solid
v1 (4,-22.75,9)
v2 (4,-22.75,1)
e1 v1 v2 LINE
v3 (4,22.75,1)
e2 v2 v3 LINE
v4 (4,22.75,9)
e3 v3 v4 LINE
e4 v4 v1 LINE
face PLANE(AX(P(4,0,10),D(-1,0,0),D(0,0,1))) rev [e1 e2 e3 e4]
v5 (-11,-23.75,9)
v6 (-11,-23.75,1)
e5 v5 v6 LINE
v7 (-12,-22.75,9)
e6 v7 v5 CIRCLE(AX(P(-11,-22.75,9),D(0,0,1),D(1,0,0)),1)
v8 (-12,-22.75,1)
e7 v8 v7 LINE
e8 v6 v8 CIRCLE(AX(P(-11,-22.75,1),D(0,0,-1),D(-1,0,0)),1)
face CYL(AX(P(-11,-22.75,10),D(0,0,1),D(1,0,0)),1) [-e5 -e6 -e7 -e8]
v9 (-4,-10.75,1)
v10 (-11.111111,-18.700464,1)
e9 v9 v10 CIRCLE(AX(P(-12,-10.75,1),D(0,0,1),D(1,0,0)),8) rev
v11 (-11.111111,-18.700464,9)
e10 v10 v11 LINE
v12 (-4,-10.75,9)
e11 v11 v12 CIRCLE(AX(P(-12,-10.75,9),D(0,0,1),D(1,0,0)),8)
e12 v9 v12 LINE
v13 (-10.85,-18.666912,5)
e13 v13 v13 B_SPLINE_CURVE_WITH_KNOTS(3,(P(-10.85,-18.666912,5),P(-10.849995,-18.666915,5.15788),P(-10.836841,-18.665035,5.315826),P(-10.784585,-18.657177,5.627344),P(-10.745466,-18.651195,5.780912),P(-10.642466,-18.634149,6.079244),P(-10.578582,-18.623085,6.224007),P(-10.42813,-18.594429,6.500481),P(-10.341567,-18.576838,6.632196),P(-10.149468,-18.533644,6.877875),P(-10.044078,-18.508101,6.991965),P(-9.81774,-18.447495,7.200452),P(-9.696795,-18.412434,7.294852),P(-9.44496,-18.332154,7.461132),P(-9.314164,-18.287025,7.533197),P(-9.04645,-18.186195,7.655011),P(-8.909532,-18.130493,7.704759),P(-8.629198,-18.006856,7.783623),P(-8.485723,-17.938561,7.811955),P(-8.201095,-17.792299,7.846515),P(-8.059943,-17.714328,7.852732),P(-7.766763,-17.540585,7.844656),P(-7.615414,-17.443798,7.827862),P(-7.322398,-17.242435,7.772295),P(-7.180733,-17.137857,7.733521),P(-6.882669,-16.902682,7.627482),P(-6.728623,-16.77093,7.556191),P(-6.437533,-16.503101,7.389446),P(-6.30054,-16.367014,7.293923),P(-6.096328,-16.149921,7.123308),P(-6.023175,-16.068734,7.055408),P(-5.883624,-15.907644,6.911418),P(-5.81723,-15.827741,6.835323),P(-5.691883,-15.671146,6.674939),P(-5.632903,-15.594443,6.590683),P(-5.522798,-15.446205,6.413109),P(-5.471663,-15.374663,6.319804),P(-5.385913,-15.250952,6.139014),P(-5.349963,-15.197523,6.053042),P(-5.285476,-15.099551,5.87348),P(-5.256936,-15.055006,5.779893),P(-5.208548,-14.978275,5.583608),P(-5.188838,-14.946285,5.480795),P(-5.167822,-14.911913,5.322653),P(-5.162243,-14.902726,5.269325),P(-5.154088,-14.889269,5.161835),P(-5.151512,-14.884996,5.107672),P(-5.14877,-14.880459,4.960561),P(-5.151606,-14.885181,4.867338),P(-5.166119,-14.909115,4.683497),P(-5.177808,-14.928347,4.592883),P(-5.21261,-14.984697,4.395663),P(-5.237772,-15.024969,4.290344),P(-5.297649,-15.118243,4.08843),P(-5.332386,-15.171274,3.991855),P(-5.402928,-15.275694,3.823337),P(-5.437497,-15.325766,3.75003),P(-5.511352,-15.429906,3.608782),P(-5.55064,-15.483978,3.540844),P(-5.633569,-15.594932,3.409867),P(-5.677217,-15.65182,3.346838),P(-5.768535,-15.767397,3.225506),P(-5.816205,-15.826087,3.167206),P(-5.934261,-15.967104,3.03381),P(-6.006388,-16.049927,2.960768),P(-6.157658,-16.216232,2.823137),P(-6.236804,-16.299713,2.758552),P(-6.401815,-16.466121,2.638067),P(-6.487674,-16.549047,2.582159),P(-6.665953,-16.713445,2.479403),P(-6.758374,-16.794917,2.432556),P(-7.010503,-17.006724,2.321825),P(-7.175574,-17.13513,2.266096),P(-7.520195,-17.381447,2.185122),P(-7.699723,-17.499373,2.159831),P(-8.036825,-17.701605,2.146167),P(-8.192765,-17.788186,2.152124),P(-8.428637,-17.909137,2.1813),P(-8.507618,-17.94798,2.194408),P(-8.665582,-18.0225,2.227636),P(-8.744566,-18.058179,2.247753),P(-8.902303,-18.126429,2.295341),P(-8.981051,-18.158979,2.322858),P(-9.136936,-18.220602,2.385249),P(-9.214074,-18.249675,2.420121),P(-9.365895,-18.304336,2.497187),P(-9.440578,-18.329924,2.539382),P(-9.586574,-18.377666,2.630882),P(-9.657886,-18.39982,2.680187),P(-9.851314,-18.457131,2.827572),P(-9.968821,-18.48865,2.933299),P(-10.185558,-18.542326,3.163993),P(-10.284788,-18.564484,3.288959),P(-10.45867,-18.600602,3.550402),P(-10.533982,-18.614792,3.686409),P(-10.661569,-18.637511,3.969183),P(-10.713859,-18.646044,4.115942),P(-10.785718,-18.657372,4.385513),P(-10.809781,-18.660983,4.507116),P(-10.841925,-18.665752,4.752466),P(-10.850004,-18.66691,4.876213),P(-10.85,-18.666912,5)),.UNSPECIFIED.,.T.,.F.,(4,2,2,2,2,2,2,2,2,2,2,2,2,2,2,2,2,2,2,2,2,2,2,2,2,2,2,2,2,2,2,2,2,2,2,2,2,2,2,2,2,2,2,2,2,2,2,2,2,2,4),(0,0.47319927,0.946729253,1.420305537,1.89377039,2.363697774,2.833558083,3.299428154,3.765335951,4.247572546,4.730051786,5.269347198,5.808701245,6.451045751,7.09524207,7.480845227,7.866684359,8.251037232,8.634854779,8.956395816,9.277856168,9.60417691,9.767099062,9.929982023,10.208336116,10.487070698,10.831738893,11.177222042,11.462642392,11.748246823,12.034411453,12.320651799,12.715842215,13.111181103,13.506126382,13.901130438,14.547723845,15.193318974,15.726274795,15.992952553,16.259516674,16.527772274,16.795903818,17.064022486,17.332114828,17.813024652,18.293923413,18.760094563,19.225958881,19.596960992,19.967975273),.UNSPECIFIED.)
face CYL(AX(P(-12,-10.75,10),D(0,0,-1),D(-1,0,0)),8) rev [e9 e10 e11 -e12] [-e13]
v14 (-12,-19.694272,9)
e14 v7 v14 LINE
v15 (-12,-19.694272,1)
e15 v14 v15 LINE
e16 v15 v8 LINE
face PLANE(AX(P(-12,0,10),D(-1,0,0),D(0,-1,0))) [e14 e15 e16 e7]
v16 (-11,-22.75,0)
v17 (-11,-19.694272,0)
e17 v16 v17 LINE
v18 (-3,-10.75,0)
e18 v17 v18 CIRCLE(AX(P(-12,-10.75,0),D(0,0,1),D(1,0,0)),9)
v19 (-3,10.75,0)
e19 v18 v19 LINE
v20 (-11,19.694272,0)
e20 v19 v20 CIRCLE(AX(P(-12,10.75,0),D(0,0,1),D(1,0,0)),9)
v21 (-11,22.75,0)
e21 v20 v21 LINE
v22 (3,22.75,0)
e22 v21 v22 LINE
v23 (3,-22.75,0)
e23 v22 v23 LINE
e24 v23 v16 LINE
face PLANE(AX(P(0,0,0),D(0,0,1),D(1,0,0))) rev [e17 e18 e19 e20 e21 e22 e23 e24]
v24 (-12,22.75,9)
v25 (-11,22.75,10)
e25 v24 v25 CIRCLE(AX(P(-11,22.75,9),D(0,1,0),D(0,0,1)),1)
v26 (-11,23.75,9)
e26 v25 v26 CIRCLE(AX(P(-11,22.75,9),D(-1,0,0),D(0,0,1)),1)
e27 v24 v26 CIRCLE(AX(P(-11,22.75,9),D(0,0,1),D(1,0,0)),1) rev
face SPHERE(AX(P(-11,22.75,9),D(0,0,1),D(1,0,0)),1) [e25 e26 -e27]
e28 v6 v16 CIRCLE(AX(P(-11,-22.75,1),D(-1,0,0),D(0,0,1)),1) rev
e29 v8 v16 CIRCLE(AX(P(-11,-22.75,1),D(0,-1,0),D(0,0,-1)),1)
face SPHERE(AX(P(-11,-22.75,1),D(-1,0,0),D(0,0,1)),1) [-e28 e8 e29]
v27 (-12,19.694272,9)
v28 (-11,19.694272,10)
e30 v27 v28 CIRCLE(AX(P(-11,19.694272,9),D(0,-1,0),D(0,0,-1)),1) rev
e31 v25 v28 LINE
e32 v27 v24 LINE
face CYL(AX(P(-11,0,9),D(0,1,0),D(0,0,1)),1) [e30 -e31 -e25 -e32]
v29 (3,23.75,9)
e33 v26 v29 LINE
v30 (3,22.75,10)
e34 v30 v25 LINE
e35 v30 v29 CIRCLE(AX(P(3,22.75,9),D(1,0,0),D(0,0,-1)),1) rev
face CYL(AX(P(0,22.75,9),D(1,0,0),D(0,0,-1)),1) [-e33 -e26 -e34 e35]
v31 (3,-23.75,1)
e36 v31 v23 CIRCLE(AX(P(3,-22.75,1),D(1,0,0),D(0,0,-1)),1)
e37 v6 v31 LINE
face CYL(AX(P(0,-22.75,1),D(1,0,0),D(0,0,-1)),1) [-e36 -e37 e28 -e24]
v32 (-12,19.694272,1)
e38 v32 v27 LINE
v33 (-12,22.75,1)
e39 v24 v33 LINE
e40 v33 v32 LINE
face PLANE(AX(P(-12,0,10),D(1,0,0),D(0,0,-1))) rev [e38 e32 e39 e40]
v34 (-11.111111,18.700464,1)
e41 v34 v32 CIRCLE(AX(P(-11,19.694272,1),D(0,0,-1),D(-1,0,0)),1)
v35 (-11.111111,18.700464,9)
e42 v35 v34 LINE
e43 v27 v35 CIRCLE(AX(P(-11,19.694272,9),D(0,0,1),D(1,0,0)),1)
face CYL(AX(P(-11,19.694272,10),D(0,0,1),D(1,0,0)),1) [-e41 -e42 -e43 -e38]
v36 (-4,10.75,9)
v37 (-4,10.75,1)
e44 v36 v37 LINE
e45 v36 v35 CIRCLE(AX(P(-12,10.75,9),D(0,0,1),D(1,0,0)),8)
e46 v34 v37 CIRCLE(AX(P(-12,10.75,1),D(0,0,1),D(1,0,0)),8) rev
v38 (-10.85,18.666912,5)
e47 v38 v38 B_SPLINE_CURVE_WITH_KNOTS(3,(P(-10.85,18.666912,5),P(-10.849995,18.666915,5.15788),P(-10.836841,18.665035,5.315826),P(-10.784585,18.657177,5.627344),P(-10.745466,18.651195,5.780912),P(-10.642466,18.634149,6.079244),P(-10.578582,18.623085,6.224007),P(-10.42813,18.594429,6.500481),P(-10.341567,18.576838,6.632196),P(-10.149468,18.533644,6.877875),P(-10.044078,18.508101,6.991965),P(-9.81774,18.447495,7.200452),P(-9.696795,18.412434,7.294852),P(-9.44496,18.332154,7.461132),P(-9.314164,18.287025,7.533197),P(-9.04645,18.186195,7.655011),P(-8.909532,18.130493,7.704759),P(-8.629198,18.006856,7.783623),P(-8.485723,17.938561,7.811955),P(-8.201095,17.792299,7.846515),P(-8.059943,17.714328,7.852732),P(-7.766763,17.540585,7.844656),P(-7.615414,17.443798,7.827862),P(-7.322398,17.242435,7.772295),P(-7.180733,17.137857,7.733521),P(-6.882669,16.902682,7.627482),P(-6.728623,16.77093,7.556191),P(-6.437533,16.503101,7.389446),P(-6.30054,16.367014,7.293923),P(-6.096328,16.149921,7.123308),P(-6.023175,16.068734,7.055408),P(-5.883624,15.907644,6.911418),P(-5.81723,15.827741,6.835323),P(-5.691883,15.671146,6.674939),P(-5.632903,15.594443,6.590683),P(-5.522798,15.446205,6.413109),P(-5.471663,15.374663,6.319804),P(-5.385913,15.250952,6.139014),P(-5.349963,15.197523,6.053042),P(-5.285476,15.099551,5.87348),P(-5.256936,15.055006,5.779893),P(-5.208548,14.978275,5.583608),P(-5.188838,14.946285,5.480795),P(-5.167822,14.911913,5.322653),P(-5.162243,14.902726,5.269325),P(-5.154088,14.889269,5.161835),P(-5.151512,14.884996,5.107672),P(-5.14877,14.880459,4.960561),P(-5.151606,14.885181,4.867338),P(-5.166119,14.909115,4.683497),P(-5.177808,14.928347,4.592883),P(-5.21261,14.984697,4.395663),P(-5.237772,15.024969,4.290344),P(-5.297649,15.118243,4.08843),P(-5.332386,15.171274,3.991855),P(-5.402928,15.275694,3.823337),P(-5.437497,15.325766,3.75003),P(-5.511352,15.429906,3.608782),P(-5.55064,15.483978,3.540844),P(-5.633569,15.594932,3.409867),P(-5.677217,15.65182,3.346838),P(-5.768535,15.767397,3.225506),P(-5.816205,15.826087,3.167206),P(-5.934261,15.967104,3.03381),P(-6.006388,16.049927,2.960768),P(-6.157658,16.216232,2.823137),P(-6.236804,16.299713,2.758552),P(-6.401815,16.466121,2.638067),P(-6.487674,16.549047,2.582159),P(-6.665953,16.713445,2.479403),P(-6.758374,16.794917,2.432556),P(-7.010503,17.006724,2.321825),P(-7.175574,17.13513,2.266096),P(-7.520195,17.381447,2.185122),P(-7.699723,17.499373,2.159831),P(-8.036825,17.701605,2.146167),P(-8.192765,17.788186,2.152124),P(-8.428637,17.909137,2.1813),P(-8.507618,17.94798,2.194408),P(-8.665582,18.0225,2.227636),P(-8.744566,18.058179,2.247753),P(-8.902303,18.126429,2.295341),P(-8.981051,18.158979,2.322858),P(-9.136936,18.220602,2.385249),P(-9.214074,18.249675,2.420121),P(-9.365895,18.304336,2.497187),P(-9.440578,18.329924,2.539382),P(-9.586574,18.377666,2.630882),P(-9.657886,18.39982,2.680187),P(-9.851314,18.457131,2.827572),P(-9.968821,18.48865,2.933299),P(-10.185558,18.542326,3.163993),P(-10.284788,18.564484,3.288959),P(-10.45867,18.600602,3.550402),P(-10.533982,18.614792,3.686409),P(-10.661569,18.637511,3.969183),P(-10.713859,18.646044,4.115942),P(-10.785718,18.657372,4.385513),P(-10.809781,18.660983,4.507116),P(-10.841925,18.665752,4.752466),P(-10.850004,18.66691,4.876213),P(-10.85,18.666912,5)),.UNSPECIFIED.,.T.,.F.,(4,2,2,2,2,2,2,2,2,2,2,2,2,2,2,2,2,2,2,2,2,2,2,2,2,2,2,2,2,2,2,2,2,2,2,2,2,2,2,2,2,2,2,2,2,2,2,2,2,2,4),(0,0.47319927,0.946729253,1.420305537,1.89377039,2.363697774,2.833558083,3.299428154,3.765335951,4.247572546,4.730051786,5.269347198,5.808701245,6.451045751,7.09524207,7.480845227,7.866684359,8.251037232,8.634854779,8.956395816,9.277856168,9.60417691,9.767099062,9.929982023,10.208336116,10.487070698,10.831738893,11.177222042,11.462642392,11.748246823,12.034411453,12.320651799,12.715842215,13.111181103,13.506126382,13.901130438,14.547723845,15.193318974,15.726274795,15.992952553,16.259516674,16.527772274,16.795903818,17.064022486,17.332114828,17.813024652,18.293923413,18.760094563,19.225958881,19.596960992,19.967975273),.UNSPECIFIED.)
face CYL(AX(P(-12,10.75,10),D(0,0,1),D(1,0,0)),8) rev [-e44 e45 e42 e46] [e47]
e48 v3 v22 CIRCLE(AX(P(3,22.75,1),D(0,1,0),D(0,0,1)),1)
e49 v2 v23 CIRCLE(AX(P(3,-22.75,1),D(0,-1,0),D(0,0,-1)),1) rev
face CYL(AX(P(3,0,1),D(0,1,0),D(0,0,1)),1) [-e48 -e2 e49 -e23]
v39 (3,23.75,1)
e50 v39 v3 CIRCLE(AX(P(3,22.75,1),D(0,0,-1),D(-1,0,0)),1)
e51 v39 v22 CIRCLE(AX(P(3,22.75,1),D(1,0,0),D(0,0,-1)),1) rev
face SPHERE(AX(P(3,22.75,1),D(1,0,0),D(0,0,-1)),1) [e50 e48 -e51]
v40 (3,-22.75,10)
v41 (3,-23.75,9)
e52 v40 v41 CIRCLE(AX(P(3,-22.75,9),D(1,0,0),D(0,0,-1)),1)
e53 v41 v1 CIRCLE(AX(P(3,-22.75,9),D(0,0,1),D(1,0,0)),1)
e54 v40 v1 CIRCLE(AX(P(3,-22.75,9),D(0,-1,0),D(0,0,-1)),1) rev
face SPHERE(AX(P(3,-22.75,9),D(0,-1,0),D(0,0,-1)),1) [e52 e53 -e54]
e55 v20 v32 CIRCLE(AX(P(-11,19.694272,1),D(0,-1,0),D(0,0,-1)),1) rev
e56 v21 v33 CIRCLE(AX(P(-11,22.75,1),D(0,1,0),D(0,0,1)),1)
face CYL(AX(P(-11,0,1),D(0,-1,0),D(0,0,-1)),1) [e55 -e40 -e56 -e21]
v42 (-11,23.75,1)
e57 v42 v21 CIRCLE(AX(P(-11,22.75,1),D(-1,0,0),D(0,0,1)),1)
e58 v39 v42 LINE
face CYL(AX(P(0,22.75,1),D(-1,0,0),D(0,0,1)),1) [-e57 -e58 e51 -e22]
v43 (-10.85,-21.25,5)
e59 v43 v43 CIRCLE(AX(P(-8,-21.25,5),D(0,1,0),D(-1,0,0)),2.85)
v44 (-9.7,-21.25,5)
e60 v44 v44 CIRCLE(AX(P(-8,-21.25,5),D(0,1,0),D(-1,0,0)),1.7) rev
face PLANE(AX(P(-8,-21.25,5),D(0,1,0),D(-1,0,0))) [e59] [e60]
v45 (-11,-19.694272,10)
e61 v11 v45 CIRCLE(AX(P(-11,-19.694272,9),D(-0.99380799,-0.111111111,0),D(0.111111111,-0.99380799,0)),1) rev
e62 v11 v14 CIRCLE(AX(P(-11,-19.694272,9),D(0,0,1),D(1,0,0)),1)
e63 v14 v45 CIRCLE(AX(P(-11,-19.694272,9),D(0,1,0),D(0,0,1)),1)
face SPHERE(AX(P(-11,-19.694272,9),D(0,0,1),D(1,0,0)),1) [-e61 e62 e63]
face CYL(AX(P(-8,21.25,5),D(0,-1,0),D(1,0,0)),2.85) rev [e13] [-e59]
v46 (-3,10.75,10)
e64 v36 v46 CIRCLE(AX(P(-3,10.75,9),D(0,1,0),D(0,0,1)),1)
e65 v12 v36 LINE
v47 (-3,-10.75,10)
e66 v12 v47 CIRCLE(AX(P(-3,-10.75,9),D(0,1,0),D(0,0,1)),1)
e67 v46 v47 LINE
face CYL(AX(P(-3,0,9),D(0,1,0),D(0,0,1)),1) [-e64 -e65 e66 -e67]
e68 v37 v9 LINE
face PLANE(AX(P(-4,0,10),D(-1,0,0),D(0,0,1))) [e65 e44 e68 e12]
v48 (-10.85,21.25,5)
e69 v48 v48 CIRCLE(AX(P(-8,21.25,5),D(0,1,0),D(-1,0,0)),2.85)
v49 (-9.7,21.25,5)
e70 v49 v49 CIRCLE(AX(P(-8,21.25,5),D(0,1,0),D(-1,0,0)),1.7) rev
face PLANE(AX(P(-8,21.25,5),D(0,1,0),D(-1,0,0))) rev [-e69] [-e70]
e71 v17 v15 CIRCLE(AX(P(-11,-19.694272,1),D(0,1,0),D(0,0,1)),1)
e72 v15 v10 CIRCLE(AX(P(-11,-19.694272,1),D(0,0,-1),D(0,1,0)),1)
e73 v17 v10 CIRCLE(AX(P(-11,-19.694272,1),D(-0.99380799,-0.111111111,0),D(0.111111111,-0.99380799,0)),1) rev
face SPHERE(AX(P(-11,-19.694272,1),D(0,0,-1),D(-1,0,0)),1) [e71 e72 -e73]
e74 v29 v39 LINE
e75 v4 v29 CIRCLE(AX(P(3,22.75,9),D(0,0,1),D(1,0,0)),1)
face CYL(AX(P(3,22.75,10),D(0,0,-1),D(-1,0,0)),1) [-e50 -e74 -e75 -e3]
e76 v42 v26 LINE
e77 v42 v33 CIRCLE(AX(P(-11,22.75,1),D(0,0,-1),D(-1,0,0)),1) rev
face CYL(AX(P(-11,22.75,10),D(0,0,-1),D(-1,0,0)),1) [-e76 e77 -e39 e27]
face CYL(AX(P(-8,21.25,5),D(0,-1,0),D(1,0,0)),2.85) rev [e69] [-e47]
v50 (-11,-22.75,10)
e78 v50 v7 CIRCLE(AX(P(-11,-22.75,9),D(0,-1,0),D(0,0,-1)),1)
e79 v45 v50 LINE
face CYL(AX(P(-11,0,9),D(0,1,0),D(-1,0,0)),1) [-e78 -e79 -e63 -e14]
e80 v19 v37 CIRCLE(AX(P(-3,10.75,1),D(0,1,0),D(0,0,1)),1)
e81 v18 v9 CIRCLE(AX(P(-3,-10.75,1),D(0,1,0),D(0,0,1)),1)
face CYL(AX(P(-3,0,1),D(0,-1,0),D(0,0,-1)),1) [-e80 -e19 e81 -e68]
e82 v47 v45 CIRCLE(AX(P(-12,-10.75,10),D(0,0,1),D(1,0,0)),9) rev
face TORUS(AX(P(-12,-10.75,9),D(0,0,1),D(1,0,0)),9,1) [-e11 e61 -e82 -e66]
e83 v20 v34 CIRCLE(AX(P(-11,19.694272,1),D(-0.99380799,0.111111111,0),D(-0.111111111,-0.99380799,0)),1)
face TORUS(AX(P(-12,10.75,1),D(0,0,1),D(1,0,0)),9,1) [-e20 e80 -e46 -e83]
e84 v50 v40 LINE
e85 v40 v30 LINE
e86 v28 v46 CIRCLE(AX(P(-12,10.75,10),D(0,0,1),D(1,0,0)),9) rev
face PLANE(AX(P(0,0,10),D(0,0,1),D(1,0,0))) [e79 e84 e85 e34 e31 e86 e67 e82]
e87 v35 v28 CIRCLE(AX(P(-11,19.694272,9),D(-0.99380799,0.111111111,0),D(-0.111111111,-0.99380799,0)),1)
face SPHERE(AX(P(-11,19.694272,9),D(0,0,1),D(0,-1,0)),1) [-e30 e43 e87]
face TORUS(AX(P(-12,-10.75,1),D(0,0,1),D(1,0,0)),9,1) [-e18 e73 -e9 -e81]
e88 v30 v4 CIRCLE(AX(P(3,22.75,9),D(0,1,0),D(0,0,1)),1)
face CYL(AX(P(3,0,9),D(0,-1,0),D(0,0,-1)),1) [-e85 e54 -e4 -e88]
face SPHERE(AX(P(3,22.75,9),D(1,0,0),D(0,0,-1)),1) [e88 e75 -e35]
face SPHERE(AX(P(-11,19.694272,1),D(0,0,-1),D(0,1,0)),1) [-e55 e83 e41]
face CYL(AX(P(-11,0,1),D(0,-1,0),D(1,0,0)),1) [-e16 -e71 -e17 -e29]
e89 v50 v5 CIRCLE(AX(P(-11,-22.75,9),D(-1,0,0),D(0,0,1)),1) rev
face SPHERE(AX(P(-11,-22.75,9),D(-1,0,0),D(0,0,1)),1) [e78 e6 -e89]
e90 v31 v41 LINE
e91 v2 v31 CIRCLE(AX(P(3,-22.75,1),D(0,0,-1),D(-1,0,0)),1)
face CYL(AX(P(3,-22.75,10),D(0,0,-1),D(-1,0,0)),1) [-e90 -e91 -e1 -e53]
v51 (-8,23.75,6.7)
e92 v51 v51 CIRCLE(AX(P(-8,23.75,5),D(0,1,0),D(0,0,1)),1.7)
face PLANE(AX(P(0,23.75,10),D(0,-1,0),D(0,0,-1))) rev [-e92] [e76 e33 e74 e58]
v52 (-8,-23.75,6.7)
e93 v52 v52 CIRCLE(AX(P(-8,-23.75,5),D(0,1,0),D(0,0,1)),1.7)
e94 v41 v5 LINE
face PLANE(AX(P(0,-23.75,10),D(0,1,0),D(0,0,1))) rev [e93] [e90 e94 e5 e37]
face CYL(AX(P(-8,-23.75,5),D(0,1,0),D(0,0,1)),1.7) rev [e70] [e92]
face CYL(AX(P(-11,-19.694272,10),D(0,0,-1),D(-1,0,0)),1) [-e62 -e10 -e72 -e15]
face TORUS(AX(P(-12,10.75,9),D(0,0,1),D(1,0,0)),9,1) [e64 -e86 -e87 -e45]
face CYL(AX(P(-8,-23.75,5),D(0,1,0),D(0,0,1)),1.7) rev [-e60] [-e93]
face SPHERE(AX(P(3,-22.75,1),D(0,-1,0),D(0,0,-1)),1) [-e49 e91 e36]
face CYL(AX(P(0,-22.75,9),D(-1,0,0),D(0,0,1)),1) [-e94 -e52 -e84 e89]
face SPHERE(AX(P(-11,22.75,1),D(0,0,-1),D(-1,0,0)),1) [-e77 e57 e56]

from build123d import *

# Parameters (mm, degrees)
SKETCH1_W               = 8
SKETCH1_H               = 5
SKETCH1_H_2             = 47.5
BOSS_EXTRUDE1_DEPTH     = 10
SKETCH2_R               = 1.7
CUT_EXTRUDE1_DEPTH      = 51.002499938
CUT_EXTRUDE2_DEPTH      = 40
CUT_EXTRUDE2_DEPTH_BACK = 2.5
SKETCH3_R               = 2.85
FILLET1_R               = 8
FILLET2_R               = 1


with BuildPart() as part:
    # Sketch1 → Boss-Extrude1 (new body)
    with BuildSketch(Plane.XY):
        with Locations((-8, 21.25)):
            Rectangle(SKETCH1_W, SKETCH1_H)
        Rectangle(SKETCH1_W, SKETCH1_H_2)
        with Locations((-8, -21.25)):
            Rectangle(SKETCH1_W, SKETCH1_H)
    extrude(amount=BOSS_EXTRUDE1_DEPTH)

    # Sketch2 → Cut-Extrude1 (cut, through all)
    with BuildSketch(Plane(origin=(0, 23.75, 0), x_dir=(1, 0, 0), z_dir=(0, 1, 0))):
        with Locations(Location((-8, -5, 0), (0, 0, 270))):
            Circle(SKETCH2_R)
    extrude(amount=-CUT_EXTRUDE1_DEPTH, mode=Mode.SUBTRACT)

    # Sketch3 → Cut-Extrude2 (cut, two sides: drawn at the far end of the back side and taken through both)
    with BuildSketch(Plane(origin=(0, -18.75, 0), x_dir=(1, 0, 0), z_dir=(0, 1, 0)).offset(-CUT_EXTRUDE2_DEPTH_BACK)):
        with Locations((-8, -5)):
            Circle(SKETCH3_R)
    extrude(amount=CUT_EXTRUDE2_DEPTH + CUT_EXTRUDE2_DEPTH_BACK, mode=Mode.SUBTRACT)

    # Fillet1
    # the kernel refuses this fillet: 8 mm, written as the material it adds along each edge
    with BuildSketch(Plane(origin=(-4, 18.75, 0), x_dir=(-1, 0, 0), z_dir=(0, 0, 1))) as fillet1_piece_1_section:
        with BuildLine():
            CenterArc((FILLET1_R, FILLET1_R), FILLET1_R, 180, 90)
            Line((0, FILLET1_R), (0, 0))
            Line((0, 0), (FILLET1_R, 0))
        make_face()
    fillet1_piece_1 = extrude(amount=10, mode=Mode.PRIVATE)
    fillet1_piece_1 = fillet1_piece_1 - Plane(origin=(-8, 18.525887701, 5), x_dir=(1, 0, 0), z_dir=(0, -1, 0)) * Cylinder(2.85, 53, mode=Mode.PRIVATE)
    add(fillet1_piece_1)
    with BuildSketch(Plane(origin=(-4, -18.75, 0), x_dir=(0, 1, 0), z_dir=(0, 0, 1))) as fillet1_piece_2_section:
        with BuildLine():
            CenterArc((FILLET1_R, FILLET1_R), FILLET1_R, 180, 90)
            Line((0, FILLET1_R), (0, 0))
            Line((0, 0), (FILLET1_R, 0))
        make_face()
    fillet1_piece_2 = extrude(amount=10, mode=Mode.PRIVATE)
    fillet1_piece_2 = fillet1_piece_2 - Plane(origin=(-8, -12.833542895, 5), x_dir=(1, 0, 0), z_dir=(0, 1, 0)) * Cylinder(2.85, 53, mode=Mode.PRIVATE)
    add(fillet1_piece_2)

    # Fillet2
    fillet2_edges = [part.edges().sort_by_distance(p)[0] for p in [
        (4, 0, 0),
        (-4, -23.75, 0),
        (-12, -21.25, 0),
        (-12, 21.25, 10),
        (-12, 21.25, 0),
        (-4, 23.75, 0),
        (4, 23.75, 5),
        (4, -23.75, 5),
        (-12, -23.75, 5),
        (-12, -18.75, 5),
        (-12, 18.75, 5),
        (-12, 23.75, 5),
        (-12, -21.25, 10),
        (-4, -23.75, 10),
        (4, 0, 10),
        (-4, 23.75, 10),
        (-4, 0, 0),
        (-4, 0, 10),
        (-6.343145751, 16.406854249, 0),
        (-6.343145751, 16.406854249, 10),
        (-6.343145751, -16.406854249, 0),
        (-6.343145751, -16.406854249, 10),
    ]]
    fillet(fillet2_edges, radius=FILLET2_R)


solid = part.part
